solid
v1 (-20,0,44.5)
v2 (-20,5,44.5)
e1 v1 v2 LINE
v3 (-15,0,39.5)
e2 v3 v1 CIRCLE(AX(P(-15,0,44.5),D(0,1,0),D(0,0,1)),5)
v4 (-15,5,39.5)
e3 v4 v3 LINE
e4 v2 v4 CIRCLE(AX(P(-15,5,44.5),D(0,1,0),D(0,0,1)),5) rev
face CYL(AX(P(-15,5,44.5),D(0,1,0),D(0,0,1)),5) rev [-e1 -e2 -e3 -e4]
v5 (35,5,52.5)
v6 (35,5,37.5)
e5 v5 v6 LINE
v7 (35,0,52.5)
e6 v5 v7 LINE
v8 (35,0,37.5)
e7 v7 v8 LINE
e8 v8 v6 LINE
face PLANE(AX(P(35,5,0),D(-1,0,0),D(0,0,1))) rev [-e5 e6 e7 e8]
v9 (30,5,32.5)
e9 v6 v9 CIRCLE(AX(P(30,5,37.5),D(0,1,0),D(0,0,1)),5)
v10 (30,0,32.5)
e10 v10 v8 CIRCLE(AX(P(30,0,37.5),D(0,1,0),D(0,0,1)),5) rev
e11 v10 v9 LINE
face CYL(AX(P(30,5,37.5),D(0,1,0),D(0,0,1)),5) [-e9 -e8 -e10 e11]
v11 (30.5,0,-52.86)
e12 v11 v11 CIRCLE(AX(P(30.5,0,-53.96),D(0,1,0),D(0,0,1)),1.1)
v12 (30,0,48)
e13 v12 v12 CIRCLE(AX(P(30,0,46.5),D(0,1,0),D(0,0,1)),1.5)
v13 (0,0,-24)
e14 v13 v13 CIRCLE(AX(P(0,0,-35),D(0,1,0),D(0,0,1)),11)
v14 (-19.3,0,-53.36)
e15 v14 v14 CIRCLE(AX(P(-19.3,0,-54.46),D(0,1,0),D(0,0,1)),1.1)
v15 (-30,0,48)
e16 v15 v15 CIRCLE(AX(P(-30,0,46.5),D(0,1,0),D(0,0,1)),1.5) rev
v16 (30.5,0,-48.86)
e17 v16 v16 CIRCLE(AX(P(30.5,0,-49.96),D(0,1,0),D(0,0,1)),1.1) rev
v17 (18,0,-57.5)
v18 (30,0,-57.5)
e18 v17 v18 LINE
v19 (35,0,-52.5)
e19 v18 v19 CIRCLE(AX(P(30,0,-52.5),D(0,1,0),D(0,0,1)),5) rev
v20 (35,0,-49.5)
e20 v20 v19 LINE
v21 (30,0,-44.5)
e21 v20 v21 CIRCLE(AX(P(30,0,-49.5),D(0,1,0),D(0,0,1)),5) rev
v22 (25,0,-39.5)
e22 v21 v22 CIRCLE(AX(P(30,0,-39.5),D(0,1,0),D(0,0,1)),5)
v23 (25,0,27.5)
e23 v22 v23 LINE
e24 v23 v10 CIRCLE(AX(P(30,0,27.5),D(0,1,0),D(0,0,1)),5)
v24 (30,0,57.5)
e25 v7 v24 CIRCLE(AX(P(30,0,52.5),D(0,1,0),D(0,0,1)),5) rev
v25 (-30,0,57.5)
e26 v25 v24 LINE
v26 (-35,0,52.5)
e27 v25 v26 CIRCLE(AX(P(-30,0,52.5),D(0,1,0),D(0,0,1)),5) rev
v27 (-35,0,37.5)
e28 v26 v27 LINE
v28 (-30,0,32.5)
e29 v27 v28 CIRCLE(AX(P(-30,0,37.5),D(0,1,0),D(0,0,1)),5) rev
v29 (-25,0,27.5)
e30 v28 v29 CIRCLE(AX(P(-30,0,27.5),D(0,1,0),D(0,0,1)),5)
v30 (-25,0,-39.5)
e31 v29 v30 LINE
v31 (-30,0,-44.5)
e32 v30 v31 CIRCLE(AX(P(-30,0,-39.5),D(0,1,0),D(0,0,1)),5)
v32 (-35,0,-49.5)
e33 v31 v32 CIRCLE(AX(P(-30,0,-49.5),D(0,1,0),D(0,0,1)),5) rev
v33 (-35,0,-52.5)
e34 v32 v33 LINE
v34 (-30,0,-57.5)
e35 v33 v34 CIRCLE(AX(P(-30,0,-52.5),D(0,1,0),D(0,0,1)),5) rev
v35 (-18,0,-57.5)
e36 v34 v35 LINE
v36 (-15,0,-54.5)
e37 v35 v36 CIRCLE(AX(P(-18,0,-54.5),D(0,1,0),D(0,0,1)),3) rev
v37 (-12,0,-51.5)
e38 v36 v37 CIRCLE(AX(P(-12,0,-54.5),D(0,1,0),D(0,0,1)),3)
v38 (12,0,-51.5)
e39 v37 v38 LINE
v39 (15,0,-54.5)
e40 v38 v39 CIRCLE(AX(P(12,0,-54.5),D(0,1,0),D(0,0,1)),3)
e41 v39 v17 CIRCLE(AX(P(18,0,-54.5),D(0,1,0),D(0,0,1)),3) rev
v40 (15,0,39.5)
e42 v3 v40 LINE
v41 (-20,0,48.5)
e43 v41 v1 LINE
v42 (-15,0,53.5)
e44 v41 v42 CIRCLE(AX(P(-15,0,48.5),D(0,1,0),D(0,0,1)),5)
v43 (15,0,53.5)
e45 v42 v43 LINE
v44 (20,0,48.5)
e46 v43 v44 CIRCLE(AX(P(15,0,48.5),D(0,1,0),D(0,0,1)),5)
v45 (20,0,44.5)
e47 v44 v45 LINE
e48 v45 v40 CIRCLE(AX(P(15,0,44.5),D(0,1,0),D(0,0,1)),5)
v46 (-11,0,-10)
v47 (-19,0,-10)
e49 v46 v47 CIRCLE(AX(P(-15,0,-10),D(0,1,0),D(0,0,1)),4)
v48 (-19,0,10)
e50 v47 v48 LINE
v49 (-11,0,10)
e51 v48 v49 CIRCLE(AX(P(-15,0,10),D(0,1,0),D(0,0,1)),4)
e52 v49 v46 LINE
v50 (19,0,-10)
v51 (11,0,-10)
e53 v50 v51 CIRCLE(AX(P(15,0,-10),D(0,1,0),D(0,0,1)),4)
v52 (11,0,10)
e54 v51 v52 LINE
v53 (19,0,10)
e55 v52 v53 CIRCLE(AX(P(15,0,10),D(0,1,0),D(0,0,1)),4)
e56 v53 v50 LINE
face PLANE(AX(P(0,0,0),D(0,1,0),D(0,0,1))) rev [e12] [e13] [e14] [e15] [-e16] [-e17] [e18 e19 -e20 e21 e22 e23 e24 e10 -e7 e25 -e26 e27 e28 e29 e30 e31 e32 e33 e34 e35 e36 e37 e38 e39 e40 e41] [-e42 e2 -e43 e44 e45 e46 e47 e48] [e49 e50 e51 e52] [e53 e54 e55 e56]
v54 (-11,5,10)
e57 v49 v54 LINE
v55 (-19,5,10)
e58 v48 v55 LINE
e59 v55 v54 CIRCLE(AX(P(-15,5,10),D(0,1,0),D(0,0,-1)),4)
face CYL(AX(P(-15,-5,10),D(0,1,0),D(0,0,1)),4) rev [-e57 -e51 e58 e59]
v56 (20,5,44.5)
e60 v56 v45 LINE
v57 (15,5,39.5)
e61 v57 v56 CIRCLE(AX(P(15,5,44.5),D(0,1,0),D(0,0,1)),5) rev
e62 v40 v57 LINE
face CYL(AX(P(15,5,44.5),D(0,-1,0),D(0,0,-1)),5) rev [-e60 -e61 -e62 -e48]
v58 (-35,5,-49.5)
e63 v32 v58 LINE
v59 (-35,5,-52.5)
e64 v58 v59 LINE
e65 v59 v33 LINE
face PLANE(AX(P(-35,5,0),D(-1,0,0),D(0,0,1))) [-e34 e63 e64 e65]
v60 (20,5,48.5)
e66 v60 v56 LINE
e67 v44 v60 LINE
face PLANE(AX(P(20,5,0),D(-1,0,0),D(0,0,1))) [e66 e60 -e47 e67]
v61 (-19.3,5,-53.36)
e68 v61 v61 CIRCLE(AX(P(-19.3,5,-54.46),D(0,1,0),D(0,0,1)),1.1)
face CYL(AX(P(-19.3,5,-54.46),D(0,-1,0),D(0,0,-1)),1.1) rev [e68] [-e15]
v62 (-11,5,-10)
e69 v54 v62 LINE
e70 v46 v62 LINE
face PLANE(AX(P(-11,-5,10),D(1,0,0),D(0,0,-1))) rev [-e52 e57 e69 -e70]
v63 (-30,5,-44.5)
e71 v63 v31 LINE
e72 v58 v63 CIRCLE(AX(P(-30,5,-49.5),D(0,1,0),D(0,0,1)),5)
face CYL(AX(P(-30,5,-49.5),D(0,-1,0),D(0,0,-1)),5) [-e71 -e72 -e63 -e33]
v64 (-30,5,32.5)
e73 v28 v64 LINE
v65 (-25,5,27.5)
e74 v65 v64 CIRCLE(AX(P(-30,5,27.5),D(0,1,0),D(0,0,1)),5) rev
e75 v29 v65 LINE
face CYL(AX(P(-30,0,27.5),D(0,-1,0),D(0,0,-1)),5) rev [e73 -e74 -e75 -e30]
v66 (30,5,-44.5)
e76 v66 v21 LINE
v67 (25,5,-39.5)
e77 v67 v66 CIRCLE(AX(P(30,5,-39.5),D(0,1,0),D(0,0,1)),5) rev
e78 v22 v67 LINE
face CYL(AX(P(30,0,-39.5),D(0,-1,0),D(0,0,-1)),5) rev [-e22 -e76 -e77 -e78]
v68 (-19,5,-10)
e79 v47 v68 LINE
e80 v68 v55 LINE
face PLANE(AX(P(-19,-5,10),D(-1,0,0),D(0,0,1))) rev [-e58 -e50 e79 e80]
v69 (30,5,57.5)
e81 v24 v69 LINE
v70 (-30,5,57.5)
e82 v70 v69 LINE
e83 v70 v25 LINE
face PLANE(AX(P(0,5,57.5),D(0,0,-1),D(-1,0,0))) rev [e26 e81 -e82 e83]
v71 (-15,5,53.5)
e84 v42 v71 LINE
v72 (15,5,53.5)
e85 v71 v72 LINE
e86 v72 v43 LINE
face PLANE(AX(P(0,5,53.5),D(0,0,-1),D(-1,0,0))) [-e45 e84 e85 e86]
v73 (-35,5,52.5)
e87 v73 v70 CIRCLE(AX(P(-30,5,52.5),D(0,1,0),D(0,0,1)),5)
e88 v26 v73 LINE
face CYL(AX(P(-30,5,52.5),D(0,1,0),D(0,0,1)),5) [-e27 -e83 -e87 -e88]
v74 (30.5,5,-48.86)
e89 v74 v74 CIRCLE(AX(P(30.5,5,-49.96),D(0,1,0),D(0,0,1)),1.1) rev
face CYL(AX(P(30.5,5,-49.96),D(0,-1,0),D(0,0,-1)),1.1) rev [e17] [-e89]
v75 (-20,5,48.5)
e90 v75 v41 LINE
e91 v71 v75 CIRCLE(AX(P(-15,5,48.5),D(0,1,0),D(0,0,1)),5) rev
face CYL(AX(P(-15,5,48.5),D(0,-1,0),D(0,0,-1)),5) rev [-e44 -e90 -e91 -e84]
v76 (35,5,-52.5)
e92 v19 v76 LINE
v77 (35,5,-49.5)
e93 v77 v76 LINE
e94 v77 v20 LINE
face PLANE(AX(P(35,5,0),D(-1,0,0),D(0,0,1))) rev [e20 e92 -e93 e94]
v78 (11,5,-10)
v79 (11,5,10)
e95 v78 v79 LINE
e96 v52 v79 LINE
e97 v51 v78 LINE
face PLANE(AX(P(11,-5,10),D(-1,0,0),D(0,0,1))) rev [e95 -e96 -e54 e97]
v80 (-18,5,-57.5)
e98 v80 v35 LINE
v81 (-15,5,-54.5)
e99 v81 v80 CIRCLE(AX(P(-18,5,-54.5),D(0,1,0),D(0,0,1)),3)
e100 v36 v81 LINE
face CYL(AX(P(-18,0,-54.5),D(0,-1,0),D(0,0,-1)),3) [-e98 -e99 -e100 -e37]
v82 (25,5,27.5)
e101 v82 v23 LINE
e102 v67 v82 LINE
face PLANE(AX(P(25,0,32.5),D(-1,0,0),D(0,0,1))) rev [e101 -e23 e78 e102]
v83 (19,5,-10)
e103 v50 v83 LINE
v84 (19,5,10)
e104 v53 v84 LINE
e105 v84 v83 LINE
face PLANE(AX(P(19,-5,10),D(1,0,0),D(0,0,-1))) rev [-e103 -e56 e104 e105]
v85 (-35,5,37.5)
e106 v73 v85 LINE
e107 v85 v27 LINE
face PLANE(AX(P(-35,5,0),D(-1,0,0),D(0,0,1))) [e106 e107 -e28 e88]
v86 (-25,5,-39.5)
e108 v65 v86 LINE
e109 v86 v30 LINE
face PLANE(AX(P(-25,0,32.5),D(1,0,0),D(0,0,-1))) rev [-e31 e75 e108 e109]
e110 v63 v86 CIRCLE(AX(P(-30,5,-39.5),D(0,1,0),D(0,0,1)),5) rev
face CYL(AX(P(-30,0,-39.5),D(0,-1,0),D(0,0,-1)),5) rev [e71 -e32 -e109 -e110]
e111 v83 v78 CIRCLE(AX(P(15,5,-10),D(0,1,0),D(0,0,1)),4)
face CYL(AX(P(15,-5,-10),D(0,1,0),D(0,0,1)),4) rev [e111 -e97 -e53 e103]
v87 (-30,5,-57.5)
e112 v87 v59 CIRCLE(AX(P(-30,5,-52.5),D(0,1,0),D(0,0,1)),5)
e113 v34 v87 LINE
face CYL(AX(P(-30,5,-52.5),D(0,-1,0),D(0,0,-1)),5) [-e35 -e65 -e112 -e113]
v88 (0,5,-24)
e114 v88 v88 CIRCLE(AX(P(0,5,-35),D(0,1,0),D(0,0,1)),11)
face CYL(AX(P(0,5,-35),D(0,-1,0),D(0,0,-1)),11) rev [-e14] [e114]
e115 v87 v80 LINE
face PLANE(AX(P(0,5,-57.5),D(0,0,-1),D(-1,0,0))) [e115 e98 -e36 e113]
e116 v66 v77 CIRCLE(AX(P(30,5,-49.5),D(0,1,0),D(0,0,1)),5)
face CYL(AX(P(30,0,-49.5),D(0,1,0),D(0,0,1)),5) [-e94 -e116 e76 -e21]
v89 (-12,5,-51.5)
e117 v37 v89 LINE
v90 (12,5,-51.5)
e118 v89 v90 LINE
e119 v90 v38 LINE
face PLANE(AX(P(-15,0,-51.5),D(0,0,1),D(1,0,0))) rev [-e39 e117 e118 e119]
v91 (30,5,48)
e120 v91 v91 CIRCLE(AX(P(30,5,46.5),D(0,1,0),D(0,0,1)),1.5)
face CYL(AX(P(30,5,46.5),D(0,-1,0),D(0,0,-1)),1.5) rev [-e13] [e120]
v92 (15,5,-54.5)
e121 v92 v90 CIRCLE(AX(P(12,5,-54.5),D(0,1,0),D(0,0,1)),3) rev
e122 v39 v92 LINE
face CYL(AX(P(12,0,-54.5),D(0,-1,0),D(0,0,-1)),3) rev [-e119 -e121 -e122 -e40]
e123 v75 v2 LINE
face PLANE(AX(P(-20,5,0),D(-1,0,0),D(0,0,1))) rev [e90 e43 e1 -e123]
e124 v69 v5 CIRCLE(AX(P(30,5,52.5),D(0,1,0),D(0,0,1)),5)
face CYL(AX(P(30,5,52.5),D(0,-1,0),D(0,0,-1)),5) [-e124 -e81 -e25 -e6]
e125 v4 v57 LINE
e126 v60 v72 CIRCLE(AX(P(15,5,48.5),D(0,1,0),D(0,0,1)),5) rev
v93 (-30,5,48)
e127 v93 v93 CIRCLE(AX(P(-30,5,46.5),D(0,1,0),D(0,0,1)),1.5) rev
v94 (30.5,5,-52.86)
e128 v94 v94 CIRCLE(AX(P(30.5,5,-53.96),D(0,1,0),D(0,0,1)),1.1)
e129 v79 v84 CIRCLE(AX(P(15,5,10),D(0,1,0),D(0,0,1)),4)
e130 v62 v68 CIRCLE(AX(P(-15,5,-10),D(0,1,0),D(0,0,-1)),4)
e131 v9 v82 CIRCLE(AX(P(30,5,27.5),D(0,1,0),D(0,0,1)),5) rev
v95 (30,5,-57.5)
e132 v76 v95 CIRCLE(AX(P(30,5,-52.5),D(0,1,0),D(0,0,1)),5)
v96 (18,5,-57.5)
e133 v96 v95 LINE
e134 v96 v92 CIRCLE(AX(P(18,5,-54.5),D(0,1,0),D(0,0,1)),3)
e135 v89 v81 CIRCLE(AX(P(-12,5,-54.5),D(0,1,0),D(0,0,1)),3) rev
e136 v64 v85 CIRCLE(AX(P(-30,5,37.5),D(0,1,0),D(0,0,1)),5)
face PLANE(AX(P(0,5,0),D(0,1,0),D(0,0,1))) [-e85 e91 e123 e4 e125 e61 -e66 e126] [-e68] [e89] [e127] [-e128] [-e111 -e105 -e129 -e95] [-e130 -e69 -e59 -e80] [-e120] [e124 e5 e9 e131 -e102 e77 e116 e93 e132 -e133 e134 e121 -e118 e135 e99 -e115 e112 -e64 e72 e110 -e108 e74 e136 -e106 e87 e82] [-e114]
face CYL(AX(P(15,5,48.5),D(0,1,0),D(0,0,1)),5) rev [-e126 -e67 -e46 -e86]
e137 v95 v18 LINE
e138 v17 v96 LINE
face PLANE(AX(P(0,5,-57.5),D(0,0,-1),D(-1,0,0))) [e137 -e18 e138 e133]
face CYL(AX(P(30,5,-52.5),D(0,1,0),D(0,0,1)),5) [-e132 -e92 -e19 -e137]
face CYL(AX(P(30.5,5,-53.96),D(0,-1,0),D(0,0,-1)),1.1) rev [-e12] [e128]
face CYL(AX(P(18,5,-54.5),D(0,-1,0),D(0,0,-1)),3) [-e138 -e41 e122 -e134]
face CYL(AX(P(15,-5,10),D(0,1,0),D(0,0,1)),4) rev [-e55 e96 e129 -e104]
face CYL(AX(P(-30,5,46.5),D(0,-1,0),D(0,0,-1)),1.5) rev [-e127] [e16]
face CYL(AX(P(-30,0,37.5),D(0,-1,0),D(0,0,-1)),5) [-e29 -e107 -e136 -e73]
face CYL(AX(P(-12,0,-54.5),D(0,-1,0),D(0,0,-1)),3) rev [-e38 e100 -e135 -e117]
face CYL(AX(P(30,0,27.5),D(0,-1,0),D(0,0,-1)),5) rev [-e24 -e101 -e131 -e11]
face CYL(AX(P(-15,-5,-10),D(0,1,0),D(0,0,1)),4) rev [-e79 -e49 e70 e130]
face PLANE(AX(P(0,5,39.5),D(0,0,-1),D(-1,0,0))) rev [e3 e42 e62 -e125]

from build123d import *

# Parameters (mm, degrees)
SKETCH_1_W          = 70
SKETCH_1_H          = 115
SKETCH_1_R          = 1.5
SKETCH_1_R_2        = 1.1
SKETCH_1_R_3        = 11
SKETCH_1_W_2        = 40
SKETCH_1_H_2        = 14
EXTRUDE_1_DEPTH     = 5
FILLET_1_R          = 5
FILLET_2_R          = 5
SKETCH_3_W          = 30
SKETCH_3_H          = 6
SKETCH_3_W_2        = 10
SKETCH_3_H_2        = 77
CUT_EXTRUDE_1_DEPTH = 5
FILLET_START        = -1
FILLET_4_DEPTH      = 7
FILLET_4_2_DEPTH    = 5
FILLET_5_R          = 5
CUT_EXTRUDE_2_DEPTH = 10


with BuildPart() as part:
    # 草图1 → 凸台-拉伸1 (new body)
    with BuildSketch(Plane(origin=(0, 0, 0), x_dir=(1, 0, 0), z_dir=(0, 1, 0))):
        Rectangle(SKETCH_1_W, SKETCH_1_H)
        with Locations(Location((30, -46.5, 0), (0, 0, 270))):
            Circle(SKETCH_1_R, mode=Mode.SUBTRACT)
        with Locations(Location((-30, -46.5, 0), (0, 0, 270))):
            Circle(SKETCH_1_R, mode=Mode.SUBTRACT)
        with Locations(Location((30.5, 53.96, 0), (0, 0, 270))):
            Circle(SKETCH_1_R_2, mode=Mode.SUBTRACT)
        with Locations(Location((30.5, 49.96, 0), (0, 0, 270))):
            Circle(SKETCH_1_R_2, mode=Mode.SUBTRACT)
        with Locations(Location((-19.3, 54.46, 0), (0, 0, 270))):
            Circle(SKETCH_1_R_2, mode=Mode.SUBTRACT)
        with Locations(Location((0, 35, 0), (0, 0, 270))):
            Circle(SKETCH_1_R_3, mode=Mode.SUBTRACT)
        with Locations((0, -46.5)):
            Rectangle(SKETCH_1_W_2, SKETCH_1_H_2, mode=Mode.SUBTRACT)
    extrude(amount=EXTRUDE_1_DEPTH)

    # 圆角1
    fillet_1_edges = [part.edges().sort_by_distance(p)[0] for p in [
        (-35, 2.5, 57.5),
        (-35, 2.5, -57.5),
        (35, 2.5, -57.5),
        (35, 2.5, 57.5),
    ]]
    fillet(fillet_1_edges, radius=FILLET_1_R)

    # 圆角2
    fillet_2_edges = [part.edges().sort_by_distance(p)[0] for p in [
        (20, 2.5, 39.5),
        (-20, 2.5, 39.5),
        (-20, 2.5, 53.5),
        (20, 2.5, 53.5),
    ]]
    fillet(fillet_2_edges, radius=FILLET_2_R)

    # 草图3 → 切除-拉伸1 (cut)
    with BuildSketch(Plane(origin=(0, 5, 0), x_dir=(1, 0, 0), z_dir=(0, 1, 0))):
        with Locations((0, 54.5)):
            Rectangle(SKETCH_3_W, SKETCH_3_H)
        with Locations((30, 6)):
            Rectangle(SKETCH_3_W_2, SKETCH_3_H_2)
        with Locations((-30, 6)):
            Rectangle(SKETCH_3_W_2, SKETCH_3_H_2)
    extrude(amount=-CUT_EXTRUDE_1_DEPTH, mode=Mode.SUBTRACT)

    # 圆角4: read off the stored shape, not the designer's step
    # 圆角4 outline → 圆角4 (cut)
    with BuildSketch(Plane(origin=(0, 0, 0), x_dir=(1, 0, 0), z_dir=(0, 1, 0)).offset(FILLET_START)):
        with BuildLine():
            Line((15, 57.5), (15, 54.5))
            ThreePointArc((15, 54.5), (15.878679656, 56.621320344), (18, 57.5))
            Line((18, 57.5), (15, 57.5))
        make_face()
        with BuildLine():
            ThreePointArc((-18, 57.5), (-15.878679656, 56.621320344), (-15, 54.5))
            Line((-15, 54.5), (-15, 57.5))
            Line((-15, 57.5), (-18, 57.5))
        make_face()
    extrude(amount=FILLET_4_DEPTH, mode=Mode.SUBTRACT)

    # Fillet 4 2 outline → Fillet 4 2 (add)
    with BuildSketch(Plane(origin=(0, 0, 0), x_dir=(1, 0, 0), z_dir=(0, 1, 0))):
        with BuildLine():
            Line((15, 51.5), (15, 54.5))
            ThreePointArc((15, 54.5), (14.121320344, 52.378679656), (12, 51.5))
            Line((12, 51.5), (15, 51.5))
        make_face()
        with BuildLine():
            Line((-15, 51.5), (-12, 51.5))
            ThreePointArc((-12, 51.5), (-14.121320344, 52.378679656), (-15, 54.5))
            Line((-15, 54.5), (-15, 51.5))
        make_face()
    extrude(amount=FILLET_4_2_DEPTH)

    # 圆角5
    fillet_5_edges = [part.edges().sort_by_distance(p)[0] for p in [
        (-25, 2.5, 32.5),
        (25, 2.5, 32.5),
        (25, 2.5, -44.5),
        (-25, 2.5, -44.5),
    ]]
    fillet(fillet_5_edges, radius=FILLET_5_R)
    fillet_5_2_edges = [part.edges().sort_by_distance(p)[0] for p in [
        (-35, 2.5, 32.5),
        (35, 2.5, 32.5),
        (35, 2.5, -44.5),
        (-35, 2.5, -44.5),
    ]]
    fillet(fillet_5_2_edges, radius=FILLET_5_R - 0.0001)  # a hair under: the kernel refuses the full size

    # 草图4 → 切除-拉伸2 (cut)
    with BuildSketch(Plane(origin=(0, 5, 0), x_dir=(1, 0, 0), z_dir=(0, 1, 0))):
        with BuildLine():
            Line((11, -10), (11, 10))
            ThreePointArc((11, 10), (15, 14), (19, 10))
            Line((19, 10), (19, -10))
            ThreePointArc((19, -10), (15, -14), (11, -10))
        make_face()
        with BuildLine():
            Line((-11, -10), (-11, 10))
            ThreePointArc((-11, 10), (-15, 14), (-19, 10))
            Line((-19, 10), (-19, -10))
            ThreePointArc((-19, -10), (-15, -14), (-11, -10))
        make_face()
    extrude(amount=-CUT_EXTRUDE_2_DEPTH, mode=Mode.SUBTRACT)


solid = part.part
